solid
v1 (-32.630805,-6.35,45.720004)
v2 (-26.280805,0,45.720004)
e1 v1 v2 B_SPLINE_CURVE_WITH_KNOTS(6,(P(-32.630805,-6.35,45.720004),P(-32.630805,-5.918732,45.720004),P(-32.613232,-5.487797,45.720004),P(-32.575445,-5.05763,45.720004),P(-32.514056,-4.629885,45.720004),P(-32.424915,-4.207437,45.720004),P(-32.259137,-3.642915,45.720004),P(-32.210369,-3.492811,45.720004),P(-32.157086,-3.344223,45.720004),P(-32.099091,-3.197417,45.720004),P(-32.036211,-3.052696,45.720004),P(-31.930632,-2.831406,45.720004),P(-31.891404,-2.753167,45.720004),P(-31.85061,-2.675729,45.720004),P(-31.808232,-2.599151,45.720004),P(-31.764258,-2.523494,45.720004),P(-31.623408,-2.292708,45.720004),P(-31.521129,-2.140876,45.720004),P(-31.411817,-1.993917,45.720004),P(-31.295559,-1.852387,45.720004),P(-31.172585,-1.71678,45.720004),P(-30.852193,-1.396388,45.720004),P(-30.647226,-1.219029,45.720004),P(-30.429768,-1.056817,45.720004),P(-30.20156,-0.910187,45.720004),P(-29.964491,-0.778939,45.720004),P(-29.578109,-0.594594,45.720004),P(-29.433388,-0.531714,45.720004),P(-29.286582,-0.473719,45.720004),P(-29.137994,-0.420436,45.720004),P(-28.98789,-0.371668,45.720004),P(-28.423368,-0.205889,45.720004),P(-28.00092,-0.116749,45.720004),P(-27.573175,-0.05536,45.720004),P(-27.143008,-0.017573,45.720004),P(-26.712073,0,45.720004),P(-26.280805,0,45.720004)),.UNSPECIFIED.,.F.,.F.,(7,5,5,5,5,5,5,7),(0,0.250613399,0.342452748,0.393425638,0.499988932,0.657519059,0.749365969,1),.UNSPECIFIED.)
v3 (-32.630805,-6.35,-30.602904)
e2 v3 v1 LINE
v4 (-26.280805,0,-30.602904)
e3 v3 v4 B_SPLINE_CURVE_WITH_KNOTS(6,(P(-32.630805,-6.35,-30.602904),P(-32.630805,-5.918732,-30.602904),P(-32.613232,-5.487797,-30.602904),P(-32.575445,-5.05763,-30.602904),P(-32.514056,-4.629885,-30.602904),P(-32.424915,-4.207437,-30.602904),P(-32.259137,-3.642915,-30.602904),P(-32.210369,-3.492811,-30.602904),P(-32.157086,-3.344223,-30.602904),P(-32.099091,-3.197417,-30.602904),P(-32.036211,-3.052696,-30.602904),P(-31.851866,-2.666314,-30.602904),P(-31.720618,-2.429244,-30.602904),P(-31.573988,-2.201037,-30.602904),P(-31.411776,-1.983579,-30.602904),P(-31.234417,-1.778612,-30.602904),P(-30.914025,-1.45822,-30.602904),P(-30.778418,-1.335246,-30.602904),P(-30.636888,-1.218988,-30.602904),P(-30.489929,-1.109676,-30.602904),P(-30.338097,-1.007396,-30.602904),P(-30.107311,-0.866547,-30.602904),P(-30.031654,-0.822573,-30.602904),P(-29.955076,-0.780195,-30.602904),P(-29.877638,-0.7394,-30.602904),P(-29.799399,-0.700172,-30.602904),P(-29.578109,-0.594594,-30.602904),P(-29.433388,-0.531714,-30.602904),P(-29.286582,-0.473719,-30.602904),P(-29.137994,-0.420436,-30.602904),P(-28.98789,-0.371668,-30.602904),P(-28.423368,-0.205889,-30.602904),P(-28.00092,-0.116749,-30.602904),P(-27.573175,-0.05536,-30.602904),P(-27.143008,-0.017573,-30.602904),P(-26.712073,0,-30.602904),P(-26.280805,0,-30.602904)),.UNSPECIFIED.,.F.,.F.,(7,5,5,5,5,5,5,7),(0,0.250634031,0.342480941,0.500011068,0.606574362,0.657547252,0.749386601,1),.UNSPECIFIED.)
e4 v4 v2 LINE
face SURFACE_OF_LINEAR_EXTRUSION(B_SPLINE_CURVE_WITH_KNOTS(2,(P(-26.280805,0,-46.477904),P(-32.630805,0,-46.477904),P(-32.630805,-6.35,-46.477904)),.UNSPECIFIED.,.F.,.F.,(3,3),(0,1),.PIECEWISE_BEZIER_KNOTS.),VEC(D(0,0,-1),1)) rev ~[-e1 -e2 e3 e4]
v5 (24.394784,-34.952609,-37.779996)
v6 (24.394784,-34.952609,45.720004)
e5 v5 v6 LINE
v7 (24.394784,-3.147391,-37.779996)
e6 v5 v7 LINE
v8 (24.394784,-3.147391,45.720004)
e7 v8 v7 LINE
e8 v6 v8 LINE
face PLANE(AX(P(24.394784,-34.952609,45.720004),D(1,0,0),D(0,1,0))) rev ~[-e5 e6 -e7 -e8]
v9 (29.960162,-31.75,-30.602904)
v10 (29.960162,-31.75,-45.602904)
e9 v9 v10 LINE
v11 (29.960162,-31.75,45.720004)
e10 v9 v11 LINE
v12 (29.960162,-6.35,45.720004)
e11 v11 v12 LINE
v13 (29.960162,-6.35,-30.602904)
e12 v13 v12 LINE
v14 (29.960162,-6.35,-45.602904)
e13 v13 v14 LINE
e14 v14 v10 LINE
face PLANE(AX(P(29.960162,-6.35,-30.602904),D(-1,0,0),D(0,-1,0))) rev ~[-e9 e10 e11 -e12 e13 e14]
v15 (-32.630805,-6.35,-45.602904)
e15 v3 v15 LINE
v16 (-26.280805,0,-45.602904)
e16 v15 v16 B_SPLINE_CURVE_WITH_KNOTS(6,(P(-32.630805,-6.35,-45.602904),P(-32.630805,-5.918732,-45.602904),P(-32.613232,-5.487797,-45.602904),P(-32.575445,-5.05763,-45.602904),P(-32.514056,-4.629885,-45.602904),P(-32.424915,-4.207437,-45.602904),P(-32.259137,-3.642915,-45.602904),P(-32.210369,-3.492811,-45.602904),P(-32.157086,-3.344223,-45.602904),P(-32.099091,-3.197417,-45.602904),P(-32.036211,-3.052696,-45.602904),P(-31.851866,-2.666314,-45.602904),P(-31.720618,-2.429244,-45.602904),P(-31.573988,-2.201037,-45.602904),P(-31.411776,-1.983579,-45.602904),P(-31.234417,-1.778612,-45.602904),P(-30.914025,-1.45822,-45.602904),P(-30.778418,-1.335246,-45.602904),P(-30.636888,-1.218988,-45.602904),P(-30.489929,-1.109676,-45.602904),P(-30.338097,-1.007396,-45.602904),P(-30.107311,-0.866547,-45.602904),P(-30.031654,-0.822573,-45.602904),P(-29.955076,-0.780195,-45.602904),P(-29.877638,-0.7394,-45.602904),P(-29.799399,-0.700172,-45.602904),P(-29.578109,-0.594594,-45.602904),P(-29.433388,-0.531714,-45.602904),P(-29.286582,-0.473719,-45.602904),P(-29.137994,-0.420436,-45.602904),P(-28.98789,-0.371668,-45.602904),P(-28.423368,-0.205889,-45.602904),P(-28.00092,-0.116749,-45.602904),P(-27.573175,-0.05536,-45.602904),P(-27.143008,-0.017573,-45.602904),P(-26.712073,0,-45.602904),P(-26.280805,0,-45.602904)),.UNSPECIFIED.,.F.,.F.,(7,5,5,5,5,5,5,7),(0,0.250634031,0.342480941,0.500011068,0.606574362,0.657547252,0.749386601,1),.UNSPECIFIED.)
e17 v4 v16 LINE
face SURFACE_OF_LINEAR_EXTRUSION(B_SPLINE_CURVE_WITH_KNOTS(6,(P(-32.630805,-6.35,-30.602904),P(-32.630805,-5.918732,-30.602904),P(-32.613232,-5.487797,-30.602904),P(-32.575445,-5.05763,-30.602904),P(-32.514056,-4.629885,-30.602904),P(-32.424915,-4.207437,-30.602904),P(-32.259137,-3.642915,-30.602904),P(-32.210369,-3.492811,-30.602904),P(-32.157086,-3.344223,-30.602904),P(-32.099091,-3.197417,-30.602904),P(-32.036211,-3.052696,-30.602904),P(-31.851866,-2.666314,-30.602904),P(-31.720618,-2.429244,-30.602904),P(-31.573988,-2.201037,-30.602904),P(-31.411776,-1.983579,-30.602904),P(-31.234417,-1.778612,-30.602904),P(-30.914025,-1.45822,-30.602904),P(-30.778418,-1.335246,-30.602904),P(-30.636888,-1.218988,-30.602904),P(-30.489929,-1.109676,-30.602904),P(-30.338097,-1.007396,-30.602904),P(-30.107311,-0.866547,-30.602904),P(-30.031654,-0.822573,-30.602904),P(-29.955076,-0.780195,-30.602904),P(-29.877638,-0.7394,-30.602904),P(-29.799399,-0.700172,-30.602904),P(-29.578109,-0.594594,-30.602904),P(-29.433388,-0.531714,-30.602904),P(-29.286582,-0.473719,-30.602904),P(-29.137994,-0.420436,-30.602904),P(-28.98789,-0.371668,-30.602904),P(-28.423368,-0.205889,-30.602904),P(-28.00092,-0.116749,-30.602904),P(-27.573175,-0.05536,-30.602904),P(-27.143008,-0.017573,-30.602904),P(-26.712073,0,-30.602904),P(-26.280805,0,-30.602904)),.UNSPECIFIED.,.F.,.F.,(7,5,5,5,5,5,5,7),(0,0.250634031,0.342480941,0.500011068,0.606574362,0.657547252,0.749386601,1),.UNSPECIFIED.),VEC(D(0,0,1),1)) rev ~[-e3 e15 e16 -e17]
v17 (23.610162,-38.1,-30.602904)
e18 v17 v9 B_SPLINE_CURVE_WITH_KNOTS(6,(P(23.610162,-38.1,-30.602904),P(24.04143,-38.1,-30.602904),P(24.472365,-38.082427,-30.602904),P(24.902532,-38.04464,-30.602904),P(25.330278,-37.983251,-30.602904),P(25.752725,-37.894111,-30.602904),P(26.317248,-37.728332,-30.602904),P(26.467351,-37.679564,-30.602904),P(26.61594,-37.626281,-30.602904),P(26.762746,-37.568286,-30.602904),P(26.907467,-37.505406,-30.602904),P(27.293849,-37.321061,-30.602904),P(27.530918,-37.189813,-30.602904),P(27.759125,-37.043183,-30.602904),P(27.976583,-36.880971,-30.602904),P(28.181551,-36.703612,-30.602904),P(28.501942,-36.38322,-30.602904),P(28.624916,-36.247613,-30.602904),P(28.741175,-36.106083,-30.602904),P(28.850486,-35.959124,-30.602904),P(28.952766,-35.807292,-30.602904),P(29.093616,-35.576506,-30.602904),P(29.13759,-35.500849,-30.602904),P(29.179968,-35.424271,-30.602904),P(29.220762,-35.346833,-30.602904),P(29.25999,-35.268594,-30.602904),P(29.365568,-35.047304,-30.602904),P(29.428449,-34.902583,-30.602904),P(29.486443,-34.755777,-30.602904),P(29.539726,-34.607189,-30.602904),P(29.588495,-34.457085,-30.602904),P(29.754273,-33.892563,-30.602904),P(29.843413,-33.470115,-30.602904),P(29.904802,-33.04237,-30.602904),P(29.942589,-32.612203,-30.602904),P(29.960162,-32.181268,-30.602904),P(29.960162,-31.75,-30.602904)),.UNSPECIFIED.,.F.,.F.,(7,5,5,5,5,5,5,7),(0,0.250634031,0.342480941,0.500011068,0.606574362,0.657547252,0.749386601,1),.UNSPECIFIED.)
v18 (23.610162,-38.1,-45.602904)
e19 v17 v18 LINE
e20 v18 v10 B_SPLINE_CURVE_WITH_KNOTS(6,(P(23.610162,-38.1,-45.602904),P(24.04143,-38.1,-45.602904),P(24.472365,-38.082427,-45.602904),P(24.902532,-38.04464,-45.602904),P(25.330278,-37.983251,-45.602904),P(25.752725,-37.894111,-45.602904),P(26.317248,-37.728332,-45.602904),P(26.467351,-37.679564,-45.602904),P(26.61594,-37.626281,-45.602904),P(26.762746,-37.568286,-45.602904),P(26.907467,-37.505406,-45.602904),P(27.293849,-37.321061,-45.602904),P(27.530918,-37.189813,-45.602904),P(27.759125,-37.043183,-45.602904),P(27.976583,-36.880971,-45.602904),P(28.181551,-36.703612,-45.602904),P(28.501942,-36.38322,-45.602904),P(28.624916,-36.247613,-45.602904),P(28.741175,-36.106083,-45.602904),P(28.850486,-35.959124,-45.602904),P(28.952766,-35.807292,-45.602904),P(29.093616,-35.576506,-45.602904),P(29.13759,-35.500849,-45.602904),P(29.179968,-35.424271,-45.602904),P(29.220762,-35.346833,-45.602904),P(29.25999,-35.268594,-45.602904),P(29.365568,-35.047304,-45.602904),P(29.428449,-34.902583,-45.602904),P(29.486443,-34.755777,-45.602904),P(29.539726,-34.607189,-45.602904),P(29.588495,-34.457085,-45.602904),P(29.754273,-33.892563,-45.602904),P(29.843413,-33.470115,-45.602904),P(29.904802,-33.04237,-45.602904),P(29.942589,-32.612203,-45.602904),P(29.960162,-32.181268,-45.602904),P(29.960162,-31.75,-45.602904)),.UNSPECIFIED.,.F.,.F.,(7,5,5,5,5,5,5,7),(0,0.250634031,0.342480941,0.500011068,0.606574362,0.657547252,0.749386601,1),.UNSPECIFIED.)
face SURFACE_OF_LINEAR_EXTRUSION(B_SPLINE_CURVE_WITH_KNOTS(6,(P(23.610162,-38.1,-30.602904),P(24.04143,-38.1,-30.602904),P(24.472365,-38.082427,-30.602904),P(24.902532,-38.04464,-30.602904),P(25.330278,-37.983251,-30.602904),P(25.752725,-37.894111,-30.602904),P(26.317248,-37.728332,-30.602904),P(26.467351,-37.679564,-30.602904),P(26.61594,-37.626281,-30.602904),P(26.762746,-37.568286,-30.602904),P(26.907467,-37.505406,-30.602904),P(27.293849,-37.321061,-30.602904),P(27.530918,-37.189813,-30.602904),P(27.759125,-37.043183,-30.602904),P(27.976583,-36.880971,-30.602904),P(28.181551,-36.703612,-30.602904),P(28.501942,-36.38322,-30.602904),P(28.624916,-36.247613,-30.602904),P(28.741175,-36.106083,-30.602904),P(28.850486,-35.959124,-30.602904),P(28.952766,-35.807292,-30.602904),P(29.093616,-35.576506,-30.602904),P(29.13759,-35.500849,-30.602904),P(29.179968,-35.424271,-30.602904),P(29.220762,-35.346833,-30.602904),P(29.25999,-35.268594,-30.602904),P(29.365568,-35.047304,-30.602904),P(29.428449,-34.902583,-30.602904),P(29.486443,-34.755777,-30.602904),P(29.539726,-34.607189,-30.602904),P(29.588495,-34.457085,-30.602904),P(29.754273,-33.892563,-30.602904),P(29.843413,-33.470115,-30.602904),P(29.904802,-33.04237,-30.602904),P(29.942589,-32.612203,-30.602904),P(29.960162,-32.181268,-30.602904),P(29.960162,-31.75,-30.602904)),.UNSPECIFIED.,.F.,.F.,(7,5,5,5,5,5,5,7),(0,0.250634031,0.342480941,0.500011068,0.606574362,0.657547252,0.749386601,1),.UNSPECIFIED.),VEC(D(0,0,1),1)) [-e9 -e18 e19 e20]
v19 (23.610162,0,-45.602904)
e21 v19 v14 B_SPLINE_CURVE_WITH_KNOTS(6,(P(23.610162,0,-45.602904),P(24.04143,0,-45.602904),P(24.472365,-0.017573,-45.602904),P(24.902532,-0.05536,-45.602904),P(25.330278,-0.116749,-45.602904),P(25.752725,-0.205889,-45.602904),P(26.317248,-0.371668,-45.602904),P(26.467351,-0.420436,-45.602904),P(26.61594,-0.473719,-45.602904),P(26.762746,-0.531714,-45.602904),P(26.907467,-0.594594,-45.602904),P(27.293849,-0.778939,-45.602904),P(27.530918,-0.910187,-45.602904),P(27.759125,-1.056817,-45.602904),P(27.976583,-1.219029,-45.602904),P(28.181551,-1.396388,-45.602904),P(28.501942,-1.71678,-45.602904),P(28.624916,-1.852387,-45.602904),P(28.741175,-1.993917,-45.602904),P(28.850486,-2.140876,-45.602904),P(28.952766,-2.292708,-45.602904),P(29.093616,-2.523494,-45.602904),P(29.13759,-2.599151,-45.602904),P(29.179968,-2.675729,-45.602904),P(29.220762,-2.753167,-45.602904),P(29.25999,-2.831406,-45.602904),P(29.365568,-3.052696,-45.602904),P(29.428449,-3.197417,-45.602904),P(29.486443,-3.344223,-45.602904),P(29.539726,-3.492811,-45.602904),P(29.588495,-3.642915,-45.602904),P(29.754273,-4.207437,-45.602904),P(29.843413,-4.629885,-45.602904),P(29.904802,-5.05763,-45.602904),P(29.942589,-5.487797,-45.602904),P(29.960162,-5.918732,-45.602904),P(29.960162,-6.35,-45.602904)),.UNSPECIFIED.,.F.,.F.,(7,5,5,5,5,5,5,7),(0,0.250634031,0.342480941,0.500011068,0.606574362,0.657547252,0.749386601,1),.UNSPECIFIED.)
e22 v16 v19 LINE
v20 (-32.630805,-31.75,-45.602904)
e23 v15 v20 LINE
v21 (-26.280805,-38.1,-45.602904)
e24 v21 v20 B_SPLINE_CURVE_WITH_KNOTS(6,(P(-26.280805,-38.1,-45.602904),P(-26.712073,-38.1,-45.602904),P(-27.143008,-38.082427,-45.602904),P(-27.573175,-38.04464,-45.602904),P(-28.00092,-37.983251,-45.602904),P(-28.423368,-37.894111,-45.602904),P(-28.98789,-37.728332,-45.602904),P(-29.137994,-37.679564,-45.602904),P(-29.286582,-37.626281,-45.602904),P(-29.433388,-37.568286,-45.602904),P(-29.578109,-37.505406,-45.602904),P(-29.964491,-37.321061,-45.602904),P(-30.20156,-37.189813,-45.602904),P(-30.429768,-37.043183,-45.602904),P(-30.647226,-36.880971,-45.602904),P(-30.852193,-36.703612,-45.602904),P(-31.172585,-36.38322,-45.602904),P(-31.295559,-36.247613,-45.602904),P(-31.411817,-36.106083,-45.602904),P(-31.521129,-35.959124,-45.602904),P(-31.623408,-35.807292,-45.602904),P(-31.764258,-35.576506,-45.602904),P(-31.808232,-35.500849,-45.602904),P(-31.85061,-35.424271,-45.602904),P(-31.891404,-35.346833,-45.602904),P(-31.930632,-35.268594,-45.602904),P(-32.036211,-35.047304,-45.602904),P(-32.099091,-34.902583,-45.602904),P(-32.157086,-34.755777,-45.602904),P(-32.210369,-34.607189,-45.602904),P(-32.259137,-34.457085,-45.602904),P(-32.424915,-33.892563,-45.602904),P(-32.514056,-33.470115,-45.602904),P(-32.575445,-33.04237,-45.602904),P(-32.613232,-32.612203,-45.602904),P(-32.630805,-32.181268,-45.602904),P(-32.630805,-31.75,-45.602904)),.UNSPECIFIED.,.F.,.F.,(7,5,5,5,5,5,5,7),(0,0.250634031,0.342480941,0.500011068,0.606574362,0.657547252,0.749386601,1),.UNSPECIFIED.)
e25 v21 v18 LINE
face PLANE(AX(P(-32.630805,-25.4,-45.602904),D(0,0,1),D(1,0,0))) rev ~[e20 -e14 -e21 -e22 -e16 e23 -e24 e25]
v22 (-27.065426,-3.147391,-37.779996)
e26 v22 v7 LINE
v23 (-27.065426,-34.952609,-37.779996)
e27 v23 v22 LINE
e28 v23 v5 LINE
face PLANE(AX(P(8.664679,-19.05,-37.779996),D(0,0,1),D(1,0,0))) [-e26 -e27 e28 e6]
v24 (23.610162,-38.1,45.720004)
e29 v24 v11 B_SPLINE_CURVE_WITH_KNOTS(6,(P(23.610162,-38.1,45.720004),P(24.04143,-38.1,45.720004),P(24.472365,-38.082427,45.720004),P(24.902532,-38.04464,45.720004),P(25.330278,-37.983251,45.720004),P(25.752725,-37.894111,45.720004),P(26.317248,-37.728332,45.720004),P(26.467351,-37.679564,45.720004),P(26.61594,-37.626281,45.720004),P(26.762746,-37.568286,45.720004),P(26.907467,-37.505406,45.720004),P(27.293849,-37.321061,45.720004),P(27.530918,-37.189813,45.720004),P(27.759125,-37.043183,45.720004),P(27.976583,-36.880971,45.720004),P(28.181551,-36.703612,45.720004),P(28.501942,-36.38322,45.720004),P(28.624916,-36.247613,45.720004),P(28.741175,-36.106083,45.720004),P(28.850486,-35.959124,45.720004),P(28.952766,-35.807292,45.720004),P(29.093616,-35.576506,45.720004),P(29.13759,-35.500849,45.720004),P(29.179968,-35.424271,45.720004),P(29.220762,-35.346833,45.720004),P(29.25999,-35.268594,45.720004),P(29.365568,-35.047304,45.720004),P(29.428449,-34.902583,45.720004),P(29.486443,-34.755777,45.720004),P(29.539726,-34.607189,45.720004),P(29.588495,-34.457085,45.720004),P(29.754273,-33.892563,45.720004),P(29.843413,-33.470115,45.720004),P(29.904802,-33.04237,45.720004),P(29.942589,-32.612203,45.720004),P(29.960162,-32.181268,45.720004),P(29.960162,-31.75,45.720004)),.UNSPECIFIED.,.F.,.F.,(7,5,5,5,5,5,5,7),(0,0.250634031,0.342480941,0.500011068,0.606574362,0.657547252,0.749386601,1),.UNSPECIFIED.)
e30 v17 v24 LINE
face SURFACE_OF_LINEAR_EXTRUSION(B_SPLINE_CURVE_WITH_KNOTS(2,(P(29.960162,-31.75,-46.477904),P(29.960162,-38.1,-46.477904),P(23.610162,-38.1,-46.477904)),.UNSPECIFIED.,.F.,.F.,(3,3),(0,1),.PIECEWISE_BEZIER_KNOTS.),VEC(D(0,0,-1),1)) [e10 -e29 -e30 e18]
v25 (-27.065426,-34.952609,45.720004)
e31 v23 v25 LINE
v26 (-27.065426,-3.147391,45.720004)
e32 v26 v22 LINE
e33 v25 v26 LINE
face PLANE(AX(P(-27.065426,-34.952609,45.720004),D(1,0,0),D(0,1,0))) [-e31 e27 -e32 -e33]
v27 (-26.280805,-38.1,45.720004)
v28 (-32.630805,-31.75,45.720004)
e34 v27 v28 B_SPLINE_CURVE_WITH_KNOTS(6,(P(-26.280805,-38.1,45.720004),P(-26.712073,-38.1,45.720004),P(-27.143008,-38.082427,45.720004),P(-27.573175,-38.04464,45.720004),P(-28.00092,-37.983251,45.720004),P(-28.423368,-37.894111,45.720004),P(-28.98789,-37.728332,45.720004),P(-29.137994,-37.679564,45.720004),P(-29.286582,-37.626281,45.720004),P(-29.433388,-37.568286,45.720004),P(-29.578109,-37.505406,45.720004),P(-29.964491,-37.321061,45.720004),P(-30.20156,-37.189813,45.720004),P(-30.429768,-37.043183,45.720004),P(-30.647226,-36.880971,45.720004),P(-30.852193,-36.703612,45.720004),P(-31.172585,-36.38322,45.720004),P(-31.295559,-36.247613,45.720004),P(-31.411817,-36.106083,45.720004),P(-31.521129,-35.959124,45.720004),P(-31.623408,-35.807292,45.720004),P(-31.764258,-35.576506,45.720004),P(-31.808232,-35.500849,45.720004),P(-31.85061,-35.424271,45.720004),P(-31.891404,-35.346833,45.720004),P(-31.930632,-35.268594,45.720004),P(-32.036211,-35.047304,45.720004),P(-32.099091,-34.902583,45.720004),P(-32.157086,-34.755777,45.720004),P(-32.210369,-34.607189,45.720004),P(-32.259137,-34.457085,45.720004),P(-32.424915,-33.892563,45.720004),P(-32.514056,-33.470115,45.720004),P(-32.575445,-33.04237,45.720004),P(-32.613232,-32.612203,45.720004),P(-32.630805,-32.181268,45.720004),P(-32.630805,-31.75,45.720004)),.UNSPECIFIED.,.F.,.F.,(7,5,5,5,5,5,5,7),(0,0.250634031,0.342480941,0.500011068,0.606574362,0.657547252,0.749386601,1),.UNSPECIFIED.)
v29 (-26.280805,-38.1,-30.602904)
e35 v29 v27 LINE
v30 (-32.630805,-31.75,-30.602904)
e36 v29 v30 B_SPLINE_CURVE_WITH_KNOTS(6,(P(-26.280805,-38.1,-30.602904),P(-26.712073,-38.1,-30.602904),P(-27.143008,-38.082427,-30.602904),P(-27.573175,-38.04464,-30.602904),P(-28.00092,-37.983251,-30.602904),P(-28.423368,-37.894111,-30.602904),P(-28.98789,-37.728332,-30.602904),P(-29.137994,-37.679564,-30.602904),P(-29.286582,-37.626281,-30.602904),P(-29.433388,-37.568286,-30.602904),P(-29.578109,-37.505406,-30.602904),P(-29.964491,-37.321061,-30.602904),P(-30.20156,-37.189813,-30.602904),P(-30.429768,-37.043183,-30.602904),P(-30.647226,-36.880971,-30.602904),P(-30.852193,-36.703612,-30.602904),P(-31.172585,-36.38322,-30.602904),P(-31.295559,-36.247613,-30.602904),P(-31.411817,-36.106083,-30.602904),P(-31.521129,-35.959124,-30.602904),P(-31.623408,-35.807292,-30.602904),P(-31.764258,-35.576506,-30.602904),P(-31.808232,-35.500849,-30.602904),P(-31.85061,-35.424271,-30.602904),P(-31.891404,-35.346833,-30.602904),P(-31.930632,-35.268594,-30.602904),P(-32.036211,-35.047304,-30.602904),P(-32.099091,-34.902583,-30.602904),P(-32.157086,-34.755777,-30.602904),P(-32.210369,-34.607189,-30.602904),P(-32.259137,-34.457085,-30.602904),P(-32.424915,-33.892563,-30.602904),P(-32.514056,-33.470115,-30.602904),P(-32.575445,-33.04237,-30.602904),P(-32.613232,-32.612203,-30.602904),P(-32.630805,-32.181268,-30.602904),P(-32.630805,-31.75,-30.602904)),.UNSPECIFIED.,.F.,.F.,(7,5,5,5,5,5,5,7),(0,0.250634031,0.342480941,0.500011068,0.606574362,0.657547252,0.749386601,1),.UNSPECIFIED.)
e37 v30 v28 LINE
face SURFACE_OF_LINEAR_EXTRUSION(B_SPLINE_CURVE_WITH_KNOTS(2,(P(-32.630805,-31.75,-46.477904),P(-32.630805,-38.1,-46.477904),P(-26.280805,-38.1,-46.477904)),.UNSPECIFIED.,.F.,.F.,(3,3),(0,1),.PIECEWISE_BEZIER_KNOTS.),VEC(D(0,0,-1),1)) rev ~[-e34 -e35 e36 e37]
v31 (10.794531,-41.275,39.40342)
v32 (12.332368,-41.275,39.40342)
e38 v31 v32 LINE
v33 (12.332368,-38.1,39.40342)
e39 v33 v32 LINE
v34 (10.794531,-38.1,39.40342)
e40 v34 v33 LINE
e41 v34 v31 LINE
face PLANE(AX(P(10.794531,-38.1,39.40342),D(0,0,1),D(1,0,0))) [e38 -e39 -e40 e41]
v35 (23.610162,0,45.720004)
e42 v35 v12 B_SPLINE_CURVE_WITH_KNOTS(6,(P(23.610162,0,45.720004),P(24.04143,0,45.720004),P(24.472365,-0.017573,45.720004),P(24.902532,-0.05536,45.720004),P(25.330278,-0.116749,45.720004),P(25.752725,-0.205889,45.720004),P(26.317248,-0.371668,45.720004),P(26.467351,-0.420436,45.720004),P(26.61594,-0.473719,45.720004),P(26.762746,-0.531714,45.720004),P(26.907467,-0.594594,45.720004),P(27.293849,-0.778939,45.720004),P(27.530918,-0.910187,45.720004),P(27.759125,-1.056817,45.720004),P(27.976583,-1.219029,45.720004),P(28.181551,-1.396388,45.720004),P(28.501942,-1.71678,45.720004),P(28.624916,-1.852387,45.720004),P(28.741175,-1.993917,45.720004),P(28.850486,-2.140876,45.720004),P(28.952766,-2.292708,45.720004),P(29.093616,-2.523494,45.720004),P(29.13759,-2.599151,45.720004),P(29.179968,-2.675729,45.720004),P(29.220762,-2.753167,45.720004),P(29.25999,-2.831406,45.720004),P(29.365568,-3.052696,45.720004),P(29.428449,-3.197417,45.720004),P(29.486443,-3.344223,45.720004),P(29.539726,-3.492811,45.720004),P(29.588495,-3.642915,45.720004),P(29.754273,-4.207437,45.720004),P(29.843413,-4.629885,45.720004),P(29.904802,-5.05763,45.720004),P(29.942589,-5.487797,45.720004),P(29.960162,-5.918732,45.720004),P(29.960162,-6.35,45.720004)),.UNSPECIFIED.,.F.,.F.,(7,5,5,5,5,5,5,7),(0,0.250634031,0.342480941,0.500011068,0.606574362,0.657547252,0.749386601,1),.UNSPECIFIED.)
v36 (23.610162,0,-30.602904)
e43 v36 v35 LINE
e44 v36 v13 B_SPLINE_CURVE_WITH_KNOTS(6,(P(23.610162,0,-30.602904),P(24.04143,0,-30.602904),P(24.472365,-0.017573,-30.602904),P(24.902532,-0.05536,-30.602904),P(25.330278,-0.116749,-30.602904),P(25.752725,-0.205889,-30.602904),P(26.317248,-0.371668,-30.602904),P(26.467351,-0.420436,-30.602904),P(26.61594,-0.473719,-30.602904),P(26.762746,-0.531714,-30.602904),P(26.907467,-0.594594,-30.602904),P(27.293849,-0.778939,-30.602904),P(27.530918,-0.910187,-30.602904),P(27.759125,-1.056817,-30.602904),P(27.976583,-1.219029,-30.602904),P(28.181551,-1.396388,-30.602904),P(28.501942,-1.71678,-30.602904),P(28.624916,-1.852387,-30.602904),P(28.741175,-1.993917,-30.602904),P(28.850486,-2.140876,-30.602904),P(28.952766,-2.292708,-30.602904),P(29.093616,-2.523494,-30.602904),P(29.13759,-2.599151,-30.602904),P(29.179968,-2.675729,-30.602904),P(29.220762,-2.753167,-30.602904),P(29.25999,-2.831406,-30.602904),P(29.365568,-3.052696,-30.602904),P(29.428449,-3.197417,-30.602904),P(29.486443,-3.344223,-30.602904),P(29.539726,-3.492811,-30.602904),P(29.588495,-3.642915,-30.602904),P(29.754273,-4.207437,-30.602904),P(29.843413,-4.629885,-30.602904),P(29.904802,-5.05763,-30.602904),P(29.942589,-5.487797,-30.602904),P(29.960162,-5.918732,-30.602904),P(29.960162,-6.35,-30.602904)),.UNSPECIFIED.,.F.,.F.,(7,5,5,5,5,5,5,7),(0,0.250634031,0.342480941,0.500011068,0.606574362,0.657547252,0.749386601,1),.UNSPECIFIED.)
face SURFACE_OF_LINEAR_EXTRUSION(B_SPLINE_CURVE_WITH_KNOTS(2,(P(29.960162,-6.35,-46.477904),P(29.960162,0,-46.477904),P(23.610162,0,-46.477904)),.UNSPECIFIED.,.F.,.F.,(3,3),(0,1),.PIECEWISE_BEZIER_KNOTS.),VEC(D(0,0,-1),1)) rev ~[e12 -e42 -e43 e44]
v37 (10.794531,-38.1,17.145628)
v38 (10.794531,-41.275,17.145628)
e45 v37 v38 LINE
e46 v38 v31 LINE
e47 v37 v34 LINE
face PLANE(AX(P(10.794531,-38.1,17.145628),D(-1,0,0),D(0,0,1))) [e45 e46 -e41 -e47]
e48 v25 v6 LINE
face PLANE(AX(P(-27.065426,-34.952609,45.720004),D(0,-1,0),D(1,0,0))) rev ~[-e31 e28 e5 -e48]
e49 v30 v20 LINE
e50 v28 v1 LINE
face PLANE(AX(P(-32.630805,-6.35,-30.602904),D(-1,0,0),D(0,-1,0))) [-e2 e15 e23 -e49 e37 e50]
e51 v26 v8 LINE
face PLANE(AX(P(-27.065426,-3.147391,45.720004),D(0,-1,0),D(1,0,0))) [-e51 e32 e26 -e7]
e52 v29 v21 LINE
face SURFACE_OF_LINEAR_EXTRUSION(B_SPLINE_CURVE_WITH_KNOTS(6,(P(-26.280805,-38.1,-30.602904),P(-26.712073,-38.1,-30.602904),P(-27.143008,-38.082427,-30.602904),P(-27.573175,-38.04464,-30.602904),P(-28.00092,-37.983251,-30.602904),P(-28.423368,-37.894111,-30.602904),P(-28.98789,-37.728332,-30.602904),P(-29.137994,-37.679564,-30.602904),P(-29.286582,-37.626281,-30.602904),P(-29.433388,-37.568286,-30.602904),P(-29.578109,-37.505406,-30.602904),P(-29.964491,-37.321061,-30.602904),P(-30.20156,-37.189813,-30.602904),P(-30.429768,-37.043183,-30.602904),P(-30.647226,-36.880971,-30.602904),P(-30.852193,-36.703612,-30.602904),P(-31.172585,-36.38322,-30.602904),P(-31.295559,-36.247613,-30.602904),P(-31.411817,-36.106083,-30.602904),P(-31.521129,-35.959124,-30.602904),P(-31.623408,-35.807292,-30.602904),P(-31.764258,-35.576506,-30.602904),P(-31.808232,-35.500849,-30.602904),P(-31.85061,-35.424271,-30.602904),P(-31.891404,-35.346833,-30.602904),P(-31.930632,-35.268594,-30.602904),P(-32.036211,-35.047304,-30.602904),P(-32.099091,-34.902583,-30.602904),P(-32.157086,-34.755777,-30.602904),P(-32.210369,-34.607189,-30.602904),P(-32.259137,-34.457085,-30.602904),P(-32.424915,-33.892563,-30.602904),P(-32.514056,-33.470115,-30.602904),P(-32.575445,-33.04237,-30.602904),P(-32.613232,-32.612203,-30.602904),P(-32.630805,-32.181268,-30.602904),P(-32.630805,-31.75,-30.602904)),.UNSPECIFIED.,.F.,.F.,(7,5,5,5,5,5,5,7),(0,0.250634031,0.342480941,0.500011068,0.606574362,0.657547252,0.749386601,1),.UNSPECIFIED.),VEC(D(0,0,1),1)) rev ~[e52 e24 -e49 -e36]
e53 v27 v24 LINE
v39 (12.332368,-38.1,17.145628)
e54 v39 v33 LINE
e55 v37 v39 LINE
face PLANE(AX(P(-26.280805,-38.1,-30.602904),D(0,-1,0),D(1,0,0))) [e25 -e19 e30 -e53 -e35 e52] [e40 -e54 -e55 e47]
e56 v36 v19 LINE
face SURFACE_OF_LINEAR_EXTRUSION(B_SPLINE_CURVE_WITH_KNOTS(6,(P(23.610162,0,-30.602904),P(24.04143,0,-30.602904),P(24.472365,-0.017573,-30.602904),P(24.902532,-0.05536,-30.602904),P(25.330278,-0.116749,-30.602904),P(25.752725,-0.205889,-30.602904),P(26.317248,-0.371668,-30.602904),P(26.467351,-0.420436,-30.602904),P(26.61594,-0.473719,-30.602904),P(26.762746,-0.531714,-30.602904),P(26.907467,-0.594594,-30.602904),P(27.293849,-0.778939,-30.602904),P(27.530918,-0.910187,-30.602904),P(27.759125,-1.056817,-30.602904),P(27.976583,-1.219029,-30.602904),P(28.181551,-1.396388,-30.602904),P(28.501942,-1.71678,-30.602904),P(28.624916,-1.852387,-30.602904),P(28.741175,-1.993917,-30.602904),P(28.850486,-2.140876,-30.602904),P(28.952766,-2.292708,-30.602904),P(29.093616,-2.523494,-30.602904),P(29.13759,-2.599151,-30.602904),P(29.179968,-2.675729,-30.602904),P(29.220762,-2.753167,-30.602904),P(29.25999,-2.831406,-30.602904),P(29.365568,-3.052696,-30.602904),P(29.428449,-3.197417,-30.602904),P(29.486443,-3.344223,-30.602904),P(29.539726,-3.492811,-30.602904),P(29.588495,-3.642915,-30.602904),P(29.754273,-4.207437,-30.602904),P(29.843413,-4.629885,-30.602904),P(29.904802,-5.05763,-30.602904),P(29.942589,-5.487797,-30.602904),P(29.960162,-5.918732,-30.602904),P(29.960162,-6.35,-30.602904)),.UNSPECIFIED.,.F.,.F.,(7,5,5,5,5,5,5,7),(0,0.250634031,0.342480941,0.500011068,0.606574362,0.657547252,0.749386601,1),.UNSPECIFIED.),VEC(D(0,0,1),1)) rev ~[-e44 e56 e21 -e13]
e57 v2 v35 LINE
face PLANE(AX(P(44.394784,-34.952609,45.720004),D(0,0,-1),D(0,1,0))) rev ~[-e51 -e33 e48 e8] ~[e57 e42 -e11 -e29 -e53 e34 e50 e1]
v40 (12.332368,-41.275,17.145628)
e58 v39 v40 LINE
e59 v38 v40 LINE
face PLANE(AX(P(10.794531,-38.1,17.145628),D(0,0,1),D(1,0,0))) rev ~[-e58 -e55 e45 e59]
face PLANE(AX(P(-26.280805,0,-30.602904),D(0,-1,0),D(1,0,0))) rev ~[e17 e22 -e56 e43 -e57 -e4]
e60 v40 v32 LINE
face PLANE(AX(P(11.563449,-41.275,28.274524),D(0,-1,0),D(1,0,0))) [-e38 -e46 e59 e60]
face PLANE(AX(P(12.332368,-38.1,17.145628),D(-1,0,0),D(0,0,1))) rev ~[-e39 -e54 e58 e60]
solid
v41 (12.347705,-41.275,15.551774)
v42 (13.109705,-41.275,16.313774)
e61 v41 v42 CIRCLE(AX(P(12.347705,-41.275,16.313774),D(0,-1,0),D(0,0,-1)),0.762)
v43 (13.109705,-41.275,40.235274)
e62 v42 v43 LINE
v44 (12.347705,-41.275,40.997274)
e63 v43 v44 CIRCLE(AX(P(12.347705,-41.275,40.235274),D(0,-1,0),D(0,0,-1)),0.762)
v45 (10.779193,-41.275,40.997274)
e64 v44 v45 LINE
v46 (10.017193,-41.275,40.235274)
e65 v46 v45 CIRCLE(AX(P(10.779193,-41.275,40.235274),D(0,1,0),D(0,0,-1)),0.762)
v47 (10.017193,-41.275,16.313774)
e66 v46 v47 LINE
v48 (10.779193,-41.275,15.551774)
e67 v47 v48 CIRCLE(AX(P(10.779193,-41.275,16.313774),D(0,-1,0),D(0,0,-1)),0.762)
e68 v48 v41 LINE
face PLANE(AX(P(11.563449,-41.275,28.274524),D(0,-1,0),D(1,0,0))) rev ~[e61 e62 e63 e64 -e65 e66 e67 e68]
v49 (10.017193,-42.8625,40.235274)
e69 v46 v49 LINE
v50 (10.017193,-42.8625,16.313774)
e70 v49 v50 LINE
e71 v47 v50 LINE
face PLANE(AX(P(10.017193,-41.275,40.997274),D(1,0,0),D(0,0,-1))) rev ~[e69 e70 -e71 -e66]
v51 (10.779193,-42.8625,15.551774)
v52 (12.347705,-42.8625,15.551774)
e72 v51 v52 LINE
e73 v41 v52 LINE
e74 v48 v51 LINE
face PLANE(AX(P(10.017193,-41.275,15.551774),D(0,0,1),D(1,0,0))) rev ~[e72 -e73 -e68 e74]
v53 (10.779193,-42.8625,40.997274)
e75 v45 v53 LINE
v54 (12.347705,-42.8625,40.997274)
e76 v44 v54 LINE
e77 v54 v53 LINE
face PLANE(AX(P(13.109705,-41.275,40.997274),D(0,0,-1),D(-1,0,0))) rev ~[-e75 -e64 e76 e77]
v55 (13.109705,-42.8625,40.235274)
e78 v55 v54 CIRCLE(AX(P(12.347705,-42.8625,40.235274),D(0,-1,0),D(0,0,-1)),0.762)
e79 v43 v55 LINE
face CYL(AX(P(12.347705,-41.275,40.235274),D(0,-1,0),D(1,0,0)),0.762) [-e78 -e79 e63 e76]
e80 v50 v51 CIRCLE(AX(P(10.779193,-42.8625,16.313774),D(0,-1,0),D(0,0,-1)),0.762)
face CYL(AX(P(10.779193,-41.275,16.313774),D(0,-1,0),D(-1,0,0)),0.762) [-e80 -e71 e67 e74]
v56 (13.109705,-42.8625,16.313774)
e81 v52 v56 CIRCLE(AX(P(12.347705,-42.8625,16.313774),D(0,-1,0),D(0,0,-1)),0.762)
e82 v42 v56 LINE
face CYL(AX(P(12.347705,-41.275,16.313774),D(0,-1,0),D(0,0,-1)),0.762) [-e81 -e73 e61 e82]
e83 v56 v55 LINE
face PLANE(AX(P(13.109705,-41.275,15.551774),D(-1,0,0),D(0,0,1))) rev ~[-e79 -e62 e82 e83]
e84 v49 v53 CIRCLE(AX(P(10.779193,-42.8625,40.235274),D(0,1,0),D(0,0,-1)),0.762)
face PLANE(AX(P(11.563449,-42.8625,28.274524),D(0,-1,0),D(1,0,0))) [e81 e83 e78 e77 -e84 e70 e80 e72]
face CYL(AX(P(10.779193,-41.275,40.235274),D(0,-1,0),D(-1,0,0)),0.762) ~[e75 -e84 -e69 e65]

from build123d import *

# Parameters (mm, degrees)
F0_W         = 82.5909674168
F0_H         = 76.3229075819
F1_DEPTH     = 25.4
F2_DEPTH     = 12.7
F3_W         = 71.4602097869
F3_H         = 31.8052172609
F4_DEPTH     = 63.5
F5_W         = 1.5378370881
F5_H         = 22.2577918321
F6_DEPTH     = 3.175
F8_DEPTH     = 1.5875
F9_R         = 0.762
F10_DEPTH    = 20
F11_DEPTH    = 20
F12_T1_DEPTH = 108.0729075819
F13_DEPTH    = 20
F14_DEPTH    = 20
F15_DEPTH    = 5


# Not quite as in the source:
# - a fillet or chamfer that OpenCascade refuses, or shapes differently, is made with other operations: its cross-section is extruded or revolved along the edge and cut away or added
# - a length typed as a fraction of an inch, garbled in the dataset ("3 / 203.2 mm" for 3/8 in), is restored


with BuildPart() as f1:
    # F0 (on Front) → F1 (new body)
    with BuildSketch(Plane.XZ):
        with Locations((8.6646787822, 7.5585497543)):
            Rectangle(F0_W, F0_H)
    extrude(amount=F1_DEPTH)

    # F2 (add): a face of the model
    f2_faces = [f1.faces().sort_by_distance(p)[0] for p in [
        (8.6646787822, -25.4, 7.5585497543),
    ]]
    extrude(f2_faces, amount=F2_DEPTH)

    # F3 (on face) → F4 (cut)
    with BuildSketch(Plane.XY.offset(45.7200035453)):
        with Locations((8.6646787822, -19.05)):
            Rectangle(F3_W, F3_H)
    extrude(amount=-F4_DEPTH, mode=Mode.SUBTRACT)

    # F5 (on face) → F6 (join)
    with BuildSketch(Plane.XZ.offset(38.1)):
        with Locations((11.5634491667, 28.2745240256)):
            Rectangle(F5_W, F5_H)
    extrude(amount=F6_DEPTH)

    # F10 (add): a face of the model
    f10_faces = [f1.faces().sort_by_distance(p)[0] for p in [
        (44.3947836757, -19.05, 13.9700035453),
    ]]
    extrude(f10_faces, amount=F10_DEPTH)

    # F11 (cut): a face of the model
    f11_faces = [f1.faces().sort_by_distance(p)[0] for p in [
        (49.9601624906, -19.05, 7.5585497543),
    ]]
    extrude(f11_faces, amount=-F11_DEPTH, mode=Mode.SUBTRACT)

    # F12: fillet of radius 6.35 on 4 edges, made by hand

    # F12_s2 → F12_t1 (cut)
    with BuildSketch(Plane.XY.offset(-46.4779040366)):
        with BuildLine():
            add(Edge.make_bspline(
                [(29.9601624906, -6.35), (29.9601624906, 0), (23.6101624906, 0)],
                knots=[0, 0, 0, 1, 1, 1], degree=2, weights=[1, 1, 1]))
            Line((23.6101624906, 0), (29.9601624906, 0))
            Line((29.9601624906, 0), (29.9601624906, -6.35))
        make_face()
        with BuildLine():
            add(Edge.make_bspline(
                [(29.9601624906, -31.75), (29.9601624906, -38.1), (23.6101624906, -38.1)],
                knots=[0, 0, 0, 1, 1, 1], degree=2, weights=[1, 1, 1]))
            Line((23.6101624906, -38.1), (29.9601624906, -38.1))
            Line((29.9601624906, -38.1), (29.9601624906, -31.75))
        make_face()
        with BuildLine():
            add(Edge.make_bspline(
                [(-26.2808049262, 0), (-32.6308049262, 0), (-32.6308049262, -6.35)],
                knots=[0, 0, 0, 1, 1, 1], degree=2, weights=[1, 1, 1]))
            Line((-32.6308049262, -6.35), (-32.6308049262, 0))
            Line((-32.6308049262, 0), (-26.2808049262, 0))
        make_face()
        with BuildLine():
            add(Edge.make_bspline(
                [(-32.6308049262, -31.75), (-32.6308049262, -38.1), (-26.2808049262, -38.1)],
                knots=[0, 0, 0, 1, 1, 1], degree=2, weights=[1, 1, 1]))
            Line((-26.2808049262, -38.1), (-32.6308049262, -38.1))
            Line((-32.6308049262, -38.1), (-32.6308049262, -31.75))
        make_face()
    extrude(amount=F12_T1_DEPTH, mode=Mode.SUBTRACT)

    # F13 (add): a face of the model
    f13_faces = [f1.faces().sort_by_distance(p)[0] for p in [
        (-1.3353212302, -19.0499999912, -30.6029040366),
    ]]
    extrude(f13_faces, amount=F13_DEPTH)

    # F14 (cut): a face of the model
    f14_faces = [f1.faces().sort_by_distance(p)[0] for p in [
        (-1.3353212178, -19.05, -17.7799964547),
    ]]
    extrude(f14_faces, amount=-F14_DEPTH, mode=Mode.SUBTRACT)

    # F15 (cut): a face of the model
    f15_faces = [f1.faces().sort_by_distance(p)[0] for p in [
        (-1.3353212302, -19.0499999912, -50.6029040366),
    ]]
    extrude(f15_faces, amount=-F15_DEPTH, mode=Mode.SUBTRACT)


with BuildPart() as f8:
    # F7 (on face) → F8 (new body)
    with BuildSketch(Plane.XZ.offset(41.275)):
        Polygon((10.0171929225, 40.99727422), (10.0171929225, 39.4034199417), (10.0171929225, 17.1456281096), (10.0171929225, 15.5517738312), (13.1097054109, 15.5517738312), (13.1097054109, 17.1456281096), (13.1097054109, 39.4034199417), (13.1097054109, 40.99727422), align=None)
    extrude(amount=F8_DEPTH)

    # F9
    f9_edges = [f8.edges().sort_by_distance(p)[0] for p in [
        (13.109705, -42.06875, 40.997274),
        (10.017193, -42.06875, 40.997274),
        (13.109705, -42.06875, 15.551774),
        (10.017193, -42.06875, 15.551774),
    ]]
    fillet(f9_edges, radius=F9_R)


solid = Compound([f1.part, f8.part])
